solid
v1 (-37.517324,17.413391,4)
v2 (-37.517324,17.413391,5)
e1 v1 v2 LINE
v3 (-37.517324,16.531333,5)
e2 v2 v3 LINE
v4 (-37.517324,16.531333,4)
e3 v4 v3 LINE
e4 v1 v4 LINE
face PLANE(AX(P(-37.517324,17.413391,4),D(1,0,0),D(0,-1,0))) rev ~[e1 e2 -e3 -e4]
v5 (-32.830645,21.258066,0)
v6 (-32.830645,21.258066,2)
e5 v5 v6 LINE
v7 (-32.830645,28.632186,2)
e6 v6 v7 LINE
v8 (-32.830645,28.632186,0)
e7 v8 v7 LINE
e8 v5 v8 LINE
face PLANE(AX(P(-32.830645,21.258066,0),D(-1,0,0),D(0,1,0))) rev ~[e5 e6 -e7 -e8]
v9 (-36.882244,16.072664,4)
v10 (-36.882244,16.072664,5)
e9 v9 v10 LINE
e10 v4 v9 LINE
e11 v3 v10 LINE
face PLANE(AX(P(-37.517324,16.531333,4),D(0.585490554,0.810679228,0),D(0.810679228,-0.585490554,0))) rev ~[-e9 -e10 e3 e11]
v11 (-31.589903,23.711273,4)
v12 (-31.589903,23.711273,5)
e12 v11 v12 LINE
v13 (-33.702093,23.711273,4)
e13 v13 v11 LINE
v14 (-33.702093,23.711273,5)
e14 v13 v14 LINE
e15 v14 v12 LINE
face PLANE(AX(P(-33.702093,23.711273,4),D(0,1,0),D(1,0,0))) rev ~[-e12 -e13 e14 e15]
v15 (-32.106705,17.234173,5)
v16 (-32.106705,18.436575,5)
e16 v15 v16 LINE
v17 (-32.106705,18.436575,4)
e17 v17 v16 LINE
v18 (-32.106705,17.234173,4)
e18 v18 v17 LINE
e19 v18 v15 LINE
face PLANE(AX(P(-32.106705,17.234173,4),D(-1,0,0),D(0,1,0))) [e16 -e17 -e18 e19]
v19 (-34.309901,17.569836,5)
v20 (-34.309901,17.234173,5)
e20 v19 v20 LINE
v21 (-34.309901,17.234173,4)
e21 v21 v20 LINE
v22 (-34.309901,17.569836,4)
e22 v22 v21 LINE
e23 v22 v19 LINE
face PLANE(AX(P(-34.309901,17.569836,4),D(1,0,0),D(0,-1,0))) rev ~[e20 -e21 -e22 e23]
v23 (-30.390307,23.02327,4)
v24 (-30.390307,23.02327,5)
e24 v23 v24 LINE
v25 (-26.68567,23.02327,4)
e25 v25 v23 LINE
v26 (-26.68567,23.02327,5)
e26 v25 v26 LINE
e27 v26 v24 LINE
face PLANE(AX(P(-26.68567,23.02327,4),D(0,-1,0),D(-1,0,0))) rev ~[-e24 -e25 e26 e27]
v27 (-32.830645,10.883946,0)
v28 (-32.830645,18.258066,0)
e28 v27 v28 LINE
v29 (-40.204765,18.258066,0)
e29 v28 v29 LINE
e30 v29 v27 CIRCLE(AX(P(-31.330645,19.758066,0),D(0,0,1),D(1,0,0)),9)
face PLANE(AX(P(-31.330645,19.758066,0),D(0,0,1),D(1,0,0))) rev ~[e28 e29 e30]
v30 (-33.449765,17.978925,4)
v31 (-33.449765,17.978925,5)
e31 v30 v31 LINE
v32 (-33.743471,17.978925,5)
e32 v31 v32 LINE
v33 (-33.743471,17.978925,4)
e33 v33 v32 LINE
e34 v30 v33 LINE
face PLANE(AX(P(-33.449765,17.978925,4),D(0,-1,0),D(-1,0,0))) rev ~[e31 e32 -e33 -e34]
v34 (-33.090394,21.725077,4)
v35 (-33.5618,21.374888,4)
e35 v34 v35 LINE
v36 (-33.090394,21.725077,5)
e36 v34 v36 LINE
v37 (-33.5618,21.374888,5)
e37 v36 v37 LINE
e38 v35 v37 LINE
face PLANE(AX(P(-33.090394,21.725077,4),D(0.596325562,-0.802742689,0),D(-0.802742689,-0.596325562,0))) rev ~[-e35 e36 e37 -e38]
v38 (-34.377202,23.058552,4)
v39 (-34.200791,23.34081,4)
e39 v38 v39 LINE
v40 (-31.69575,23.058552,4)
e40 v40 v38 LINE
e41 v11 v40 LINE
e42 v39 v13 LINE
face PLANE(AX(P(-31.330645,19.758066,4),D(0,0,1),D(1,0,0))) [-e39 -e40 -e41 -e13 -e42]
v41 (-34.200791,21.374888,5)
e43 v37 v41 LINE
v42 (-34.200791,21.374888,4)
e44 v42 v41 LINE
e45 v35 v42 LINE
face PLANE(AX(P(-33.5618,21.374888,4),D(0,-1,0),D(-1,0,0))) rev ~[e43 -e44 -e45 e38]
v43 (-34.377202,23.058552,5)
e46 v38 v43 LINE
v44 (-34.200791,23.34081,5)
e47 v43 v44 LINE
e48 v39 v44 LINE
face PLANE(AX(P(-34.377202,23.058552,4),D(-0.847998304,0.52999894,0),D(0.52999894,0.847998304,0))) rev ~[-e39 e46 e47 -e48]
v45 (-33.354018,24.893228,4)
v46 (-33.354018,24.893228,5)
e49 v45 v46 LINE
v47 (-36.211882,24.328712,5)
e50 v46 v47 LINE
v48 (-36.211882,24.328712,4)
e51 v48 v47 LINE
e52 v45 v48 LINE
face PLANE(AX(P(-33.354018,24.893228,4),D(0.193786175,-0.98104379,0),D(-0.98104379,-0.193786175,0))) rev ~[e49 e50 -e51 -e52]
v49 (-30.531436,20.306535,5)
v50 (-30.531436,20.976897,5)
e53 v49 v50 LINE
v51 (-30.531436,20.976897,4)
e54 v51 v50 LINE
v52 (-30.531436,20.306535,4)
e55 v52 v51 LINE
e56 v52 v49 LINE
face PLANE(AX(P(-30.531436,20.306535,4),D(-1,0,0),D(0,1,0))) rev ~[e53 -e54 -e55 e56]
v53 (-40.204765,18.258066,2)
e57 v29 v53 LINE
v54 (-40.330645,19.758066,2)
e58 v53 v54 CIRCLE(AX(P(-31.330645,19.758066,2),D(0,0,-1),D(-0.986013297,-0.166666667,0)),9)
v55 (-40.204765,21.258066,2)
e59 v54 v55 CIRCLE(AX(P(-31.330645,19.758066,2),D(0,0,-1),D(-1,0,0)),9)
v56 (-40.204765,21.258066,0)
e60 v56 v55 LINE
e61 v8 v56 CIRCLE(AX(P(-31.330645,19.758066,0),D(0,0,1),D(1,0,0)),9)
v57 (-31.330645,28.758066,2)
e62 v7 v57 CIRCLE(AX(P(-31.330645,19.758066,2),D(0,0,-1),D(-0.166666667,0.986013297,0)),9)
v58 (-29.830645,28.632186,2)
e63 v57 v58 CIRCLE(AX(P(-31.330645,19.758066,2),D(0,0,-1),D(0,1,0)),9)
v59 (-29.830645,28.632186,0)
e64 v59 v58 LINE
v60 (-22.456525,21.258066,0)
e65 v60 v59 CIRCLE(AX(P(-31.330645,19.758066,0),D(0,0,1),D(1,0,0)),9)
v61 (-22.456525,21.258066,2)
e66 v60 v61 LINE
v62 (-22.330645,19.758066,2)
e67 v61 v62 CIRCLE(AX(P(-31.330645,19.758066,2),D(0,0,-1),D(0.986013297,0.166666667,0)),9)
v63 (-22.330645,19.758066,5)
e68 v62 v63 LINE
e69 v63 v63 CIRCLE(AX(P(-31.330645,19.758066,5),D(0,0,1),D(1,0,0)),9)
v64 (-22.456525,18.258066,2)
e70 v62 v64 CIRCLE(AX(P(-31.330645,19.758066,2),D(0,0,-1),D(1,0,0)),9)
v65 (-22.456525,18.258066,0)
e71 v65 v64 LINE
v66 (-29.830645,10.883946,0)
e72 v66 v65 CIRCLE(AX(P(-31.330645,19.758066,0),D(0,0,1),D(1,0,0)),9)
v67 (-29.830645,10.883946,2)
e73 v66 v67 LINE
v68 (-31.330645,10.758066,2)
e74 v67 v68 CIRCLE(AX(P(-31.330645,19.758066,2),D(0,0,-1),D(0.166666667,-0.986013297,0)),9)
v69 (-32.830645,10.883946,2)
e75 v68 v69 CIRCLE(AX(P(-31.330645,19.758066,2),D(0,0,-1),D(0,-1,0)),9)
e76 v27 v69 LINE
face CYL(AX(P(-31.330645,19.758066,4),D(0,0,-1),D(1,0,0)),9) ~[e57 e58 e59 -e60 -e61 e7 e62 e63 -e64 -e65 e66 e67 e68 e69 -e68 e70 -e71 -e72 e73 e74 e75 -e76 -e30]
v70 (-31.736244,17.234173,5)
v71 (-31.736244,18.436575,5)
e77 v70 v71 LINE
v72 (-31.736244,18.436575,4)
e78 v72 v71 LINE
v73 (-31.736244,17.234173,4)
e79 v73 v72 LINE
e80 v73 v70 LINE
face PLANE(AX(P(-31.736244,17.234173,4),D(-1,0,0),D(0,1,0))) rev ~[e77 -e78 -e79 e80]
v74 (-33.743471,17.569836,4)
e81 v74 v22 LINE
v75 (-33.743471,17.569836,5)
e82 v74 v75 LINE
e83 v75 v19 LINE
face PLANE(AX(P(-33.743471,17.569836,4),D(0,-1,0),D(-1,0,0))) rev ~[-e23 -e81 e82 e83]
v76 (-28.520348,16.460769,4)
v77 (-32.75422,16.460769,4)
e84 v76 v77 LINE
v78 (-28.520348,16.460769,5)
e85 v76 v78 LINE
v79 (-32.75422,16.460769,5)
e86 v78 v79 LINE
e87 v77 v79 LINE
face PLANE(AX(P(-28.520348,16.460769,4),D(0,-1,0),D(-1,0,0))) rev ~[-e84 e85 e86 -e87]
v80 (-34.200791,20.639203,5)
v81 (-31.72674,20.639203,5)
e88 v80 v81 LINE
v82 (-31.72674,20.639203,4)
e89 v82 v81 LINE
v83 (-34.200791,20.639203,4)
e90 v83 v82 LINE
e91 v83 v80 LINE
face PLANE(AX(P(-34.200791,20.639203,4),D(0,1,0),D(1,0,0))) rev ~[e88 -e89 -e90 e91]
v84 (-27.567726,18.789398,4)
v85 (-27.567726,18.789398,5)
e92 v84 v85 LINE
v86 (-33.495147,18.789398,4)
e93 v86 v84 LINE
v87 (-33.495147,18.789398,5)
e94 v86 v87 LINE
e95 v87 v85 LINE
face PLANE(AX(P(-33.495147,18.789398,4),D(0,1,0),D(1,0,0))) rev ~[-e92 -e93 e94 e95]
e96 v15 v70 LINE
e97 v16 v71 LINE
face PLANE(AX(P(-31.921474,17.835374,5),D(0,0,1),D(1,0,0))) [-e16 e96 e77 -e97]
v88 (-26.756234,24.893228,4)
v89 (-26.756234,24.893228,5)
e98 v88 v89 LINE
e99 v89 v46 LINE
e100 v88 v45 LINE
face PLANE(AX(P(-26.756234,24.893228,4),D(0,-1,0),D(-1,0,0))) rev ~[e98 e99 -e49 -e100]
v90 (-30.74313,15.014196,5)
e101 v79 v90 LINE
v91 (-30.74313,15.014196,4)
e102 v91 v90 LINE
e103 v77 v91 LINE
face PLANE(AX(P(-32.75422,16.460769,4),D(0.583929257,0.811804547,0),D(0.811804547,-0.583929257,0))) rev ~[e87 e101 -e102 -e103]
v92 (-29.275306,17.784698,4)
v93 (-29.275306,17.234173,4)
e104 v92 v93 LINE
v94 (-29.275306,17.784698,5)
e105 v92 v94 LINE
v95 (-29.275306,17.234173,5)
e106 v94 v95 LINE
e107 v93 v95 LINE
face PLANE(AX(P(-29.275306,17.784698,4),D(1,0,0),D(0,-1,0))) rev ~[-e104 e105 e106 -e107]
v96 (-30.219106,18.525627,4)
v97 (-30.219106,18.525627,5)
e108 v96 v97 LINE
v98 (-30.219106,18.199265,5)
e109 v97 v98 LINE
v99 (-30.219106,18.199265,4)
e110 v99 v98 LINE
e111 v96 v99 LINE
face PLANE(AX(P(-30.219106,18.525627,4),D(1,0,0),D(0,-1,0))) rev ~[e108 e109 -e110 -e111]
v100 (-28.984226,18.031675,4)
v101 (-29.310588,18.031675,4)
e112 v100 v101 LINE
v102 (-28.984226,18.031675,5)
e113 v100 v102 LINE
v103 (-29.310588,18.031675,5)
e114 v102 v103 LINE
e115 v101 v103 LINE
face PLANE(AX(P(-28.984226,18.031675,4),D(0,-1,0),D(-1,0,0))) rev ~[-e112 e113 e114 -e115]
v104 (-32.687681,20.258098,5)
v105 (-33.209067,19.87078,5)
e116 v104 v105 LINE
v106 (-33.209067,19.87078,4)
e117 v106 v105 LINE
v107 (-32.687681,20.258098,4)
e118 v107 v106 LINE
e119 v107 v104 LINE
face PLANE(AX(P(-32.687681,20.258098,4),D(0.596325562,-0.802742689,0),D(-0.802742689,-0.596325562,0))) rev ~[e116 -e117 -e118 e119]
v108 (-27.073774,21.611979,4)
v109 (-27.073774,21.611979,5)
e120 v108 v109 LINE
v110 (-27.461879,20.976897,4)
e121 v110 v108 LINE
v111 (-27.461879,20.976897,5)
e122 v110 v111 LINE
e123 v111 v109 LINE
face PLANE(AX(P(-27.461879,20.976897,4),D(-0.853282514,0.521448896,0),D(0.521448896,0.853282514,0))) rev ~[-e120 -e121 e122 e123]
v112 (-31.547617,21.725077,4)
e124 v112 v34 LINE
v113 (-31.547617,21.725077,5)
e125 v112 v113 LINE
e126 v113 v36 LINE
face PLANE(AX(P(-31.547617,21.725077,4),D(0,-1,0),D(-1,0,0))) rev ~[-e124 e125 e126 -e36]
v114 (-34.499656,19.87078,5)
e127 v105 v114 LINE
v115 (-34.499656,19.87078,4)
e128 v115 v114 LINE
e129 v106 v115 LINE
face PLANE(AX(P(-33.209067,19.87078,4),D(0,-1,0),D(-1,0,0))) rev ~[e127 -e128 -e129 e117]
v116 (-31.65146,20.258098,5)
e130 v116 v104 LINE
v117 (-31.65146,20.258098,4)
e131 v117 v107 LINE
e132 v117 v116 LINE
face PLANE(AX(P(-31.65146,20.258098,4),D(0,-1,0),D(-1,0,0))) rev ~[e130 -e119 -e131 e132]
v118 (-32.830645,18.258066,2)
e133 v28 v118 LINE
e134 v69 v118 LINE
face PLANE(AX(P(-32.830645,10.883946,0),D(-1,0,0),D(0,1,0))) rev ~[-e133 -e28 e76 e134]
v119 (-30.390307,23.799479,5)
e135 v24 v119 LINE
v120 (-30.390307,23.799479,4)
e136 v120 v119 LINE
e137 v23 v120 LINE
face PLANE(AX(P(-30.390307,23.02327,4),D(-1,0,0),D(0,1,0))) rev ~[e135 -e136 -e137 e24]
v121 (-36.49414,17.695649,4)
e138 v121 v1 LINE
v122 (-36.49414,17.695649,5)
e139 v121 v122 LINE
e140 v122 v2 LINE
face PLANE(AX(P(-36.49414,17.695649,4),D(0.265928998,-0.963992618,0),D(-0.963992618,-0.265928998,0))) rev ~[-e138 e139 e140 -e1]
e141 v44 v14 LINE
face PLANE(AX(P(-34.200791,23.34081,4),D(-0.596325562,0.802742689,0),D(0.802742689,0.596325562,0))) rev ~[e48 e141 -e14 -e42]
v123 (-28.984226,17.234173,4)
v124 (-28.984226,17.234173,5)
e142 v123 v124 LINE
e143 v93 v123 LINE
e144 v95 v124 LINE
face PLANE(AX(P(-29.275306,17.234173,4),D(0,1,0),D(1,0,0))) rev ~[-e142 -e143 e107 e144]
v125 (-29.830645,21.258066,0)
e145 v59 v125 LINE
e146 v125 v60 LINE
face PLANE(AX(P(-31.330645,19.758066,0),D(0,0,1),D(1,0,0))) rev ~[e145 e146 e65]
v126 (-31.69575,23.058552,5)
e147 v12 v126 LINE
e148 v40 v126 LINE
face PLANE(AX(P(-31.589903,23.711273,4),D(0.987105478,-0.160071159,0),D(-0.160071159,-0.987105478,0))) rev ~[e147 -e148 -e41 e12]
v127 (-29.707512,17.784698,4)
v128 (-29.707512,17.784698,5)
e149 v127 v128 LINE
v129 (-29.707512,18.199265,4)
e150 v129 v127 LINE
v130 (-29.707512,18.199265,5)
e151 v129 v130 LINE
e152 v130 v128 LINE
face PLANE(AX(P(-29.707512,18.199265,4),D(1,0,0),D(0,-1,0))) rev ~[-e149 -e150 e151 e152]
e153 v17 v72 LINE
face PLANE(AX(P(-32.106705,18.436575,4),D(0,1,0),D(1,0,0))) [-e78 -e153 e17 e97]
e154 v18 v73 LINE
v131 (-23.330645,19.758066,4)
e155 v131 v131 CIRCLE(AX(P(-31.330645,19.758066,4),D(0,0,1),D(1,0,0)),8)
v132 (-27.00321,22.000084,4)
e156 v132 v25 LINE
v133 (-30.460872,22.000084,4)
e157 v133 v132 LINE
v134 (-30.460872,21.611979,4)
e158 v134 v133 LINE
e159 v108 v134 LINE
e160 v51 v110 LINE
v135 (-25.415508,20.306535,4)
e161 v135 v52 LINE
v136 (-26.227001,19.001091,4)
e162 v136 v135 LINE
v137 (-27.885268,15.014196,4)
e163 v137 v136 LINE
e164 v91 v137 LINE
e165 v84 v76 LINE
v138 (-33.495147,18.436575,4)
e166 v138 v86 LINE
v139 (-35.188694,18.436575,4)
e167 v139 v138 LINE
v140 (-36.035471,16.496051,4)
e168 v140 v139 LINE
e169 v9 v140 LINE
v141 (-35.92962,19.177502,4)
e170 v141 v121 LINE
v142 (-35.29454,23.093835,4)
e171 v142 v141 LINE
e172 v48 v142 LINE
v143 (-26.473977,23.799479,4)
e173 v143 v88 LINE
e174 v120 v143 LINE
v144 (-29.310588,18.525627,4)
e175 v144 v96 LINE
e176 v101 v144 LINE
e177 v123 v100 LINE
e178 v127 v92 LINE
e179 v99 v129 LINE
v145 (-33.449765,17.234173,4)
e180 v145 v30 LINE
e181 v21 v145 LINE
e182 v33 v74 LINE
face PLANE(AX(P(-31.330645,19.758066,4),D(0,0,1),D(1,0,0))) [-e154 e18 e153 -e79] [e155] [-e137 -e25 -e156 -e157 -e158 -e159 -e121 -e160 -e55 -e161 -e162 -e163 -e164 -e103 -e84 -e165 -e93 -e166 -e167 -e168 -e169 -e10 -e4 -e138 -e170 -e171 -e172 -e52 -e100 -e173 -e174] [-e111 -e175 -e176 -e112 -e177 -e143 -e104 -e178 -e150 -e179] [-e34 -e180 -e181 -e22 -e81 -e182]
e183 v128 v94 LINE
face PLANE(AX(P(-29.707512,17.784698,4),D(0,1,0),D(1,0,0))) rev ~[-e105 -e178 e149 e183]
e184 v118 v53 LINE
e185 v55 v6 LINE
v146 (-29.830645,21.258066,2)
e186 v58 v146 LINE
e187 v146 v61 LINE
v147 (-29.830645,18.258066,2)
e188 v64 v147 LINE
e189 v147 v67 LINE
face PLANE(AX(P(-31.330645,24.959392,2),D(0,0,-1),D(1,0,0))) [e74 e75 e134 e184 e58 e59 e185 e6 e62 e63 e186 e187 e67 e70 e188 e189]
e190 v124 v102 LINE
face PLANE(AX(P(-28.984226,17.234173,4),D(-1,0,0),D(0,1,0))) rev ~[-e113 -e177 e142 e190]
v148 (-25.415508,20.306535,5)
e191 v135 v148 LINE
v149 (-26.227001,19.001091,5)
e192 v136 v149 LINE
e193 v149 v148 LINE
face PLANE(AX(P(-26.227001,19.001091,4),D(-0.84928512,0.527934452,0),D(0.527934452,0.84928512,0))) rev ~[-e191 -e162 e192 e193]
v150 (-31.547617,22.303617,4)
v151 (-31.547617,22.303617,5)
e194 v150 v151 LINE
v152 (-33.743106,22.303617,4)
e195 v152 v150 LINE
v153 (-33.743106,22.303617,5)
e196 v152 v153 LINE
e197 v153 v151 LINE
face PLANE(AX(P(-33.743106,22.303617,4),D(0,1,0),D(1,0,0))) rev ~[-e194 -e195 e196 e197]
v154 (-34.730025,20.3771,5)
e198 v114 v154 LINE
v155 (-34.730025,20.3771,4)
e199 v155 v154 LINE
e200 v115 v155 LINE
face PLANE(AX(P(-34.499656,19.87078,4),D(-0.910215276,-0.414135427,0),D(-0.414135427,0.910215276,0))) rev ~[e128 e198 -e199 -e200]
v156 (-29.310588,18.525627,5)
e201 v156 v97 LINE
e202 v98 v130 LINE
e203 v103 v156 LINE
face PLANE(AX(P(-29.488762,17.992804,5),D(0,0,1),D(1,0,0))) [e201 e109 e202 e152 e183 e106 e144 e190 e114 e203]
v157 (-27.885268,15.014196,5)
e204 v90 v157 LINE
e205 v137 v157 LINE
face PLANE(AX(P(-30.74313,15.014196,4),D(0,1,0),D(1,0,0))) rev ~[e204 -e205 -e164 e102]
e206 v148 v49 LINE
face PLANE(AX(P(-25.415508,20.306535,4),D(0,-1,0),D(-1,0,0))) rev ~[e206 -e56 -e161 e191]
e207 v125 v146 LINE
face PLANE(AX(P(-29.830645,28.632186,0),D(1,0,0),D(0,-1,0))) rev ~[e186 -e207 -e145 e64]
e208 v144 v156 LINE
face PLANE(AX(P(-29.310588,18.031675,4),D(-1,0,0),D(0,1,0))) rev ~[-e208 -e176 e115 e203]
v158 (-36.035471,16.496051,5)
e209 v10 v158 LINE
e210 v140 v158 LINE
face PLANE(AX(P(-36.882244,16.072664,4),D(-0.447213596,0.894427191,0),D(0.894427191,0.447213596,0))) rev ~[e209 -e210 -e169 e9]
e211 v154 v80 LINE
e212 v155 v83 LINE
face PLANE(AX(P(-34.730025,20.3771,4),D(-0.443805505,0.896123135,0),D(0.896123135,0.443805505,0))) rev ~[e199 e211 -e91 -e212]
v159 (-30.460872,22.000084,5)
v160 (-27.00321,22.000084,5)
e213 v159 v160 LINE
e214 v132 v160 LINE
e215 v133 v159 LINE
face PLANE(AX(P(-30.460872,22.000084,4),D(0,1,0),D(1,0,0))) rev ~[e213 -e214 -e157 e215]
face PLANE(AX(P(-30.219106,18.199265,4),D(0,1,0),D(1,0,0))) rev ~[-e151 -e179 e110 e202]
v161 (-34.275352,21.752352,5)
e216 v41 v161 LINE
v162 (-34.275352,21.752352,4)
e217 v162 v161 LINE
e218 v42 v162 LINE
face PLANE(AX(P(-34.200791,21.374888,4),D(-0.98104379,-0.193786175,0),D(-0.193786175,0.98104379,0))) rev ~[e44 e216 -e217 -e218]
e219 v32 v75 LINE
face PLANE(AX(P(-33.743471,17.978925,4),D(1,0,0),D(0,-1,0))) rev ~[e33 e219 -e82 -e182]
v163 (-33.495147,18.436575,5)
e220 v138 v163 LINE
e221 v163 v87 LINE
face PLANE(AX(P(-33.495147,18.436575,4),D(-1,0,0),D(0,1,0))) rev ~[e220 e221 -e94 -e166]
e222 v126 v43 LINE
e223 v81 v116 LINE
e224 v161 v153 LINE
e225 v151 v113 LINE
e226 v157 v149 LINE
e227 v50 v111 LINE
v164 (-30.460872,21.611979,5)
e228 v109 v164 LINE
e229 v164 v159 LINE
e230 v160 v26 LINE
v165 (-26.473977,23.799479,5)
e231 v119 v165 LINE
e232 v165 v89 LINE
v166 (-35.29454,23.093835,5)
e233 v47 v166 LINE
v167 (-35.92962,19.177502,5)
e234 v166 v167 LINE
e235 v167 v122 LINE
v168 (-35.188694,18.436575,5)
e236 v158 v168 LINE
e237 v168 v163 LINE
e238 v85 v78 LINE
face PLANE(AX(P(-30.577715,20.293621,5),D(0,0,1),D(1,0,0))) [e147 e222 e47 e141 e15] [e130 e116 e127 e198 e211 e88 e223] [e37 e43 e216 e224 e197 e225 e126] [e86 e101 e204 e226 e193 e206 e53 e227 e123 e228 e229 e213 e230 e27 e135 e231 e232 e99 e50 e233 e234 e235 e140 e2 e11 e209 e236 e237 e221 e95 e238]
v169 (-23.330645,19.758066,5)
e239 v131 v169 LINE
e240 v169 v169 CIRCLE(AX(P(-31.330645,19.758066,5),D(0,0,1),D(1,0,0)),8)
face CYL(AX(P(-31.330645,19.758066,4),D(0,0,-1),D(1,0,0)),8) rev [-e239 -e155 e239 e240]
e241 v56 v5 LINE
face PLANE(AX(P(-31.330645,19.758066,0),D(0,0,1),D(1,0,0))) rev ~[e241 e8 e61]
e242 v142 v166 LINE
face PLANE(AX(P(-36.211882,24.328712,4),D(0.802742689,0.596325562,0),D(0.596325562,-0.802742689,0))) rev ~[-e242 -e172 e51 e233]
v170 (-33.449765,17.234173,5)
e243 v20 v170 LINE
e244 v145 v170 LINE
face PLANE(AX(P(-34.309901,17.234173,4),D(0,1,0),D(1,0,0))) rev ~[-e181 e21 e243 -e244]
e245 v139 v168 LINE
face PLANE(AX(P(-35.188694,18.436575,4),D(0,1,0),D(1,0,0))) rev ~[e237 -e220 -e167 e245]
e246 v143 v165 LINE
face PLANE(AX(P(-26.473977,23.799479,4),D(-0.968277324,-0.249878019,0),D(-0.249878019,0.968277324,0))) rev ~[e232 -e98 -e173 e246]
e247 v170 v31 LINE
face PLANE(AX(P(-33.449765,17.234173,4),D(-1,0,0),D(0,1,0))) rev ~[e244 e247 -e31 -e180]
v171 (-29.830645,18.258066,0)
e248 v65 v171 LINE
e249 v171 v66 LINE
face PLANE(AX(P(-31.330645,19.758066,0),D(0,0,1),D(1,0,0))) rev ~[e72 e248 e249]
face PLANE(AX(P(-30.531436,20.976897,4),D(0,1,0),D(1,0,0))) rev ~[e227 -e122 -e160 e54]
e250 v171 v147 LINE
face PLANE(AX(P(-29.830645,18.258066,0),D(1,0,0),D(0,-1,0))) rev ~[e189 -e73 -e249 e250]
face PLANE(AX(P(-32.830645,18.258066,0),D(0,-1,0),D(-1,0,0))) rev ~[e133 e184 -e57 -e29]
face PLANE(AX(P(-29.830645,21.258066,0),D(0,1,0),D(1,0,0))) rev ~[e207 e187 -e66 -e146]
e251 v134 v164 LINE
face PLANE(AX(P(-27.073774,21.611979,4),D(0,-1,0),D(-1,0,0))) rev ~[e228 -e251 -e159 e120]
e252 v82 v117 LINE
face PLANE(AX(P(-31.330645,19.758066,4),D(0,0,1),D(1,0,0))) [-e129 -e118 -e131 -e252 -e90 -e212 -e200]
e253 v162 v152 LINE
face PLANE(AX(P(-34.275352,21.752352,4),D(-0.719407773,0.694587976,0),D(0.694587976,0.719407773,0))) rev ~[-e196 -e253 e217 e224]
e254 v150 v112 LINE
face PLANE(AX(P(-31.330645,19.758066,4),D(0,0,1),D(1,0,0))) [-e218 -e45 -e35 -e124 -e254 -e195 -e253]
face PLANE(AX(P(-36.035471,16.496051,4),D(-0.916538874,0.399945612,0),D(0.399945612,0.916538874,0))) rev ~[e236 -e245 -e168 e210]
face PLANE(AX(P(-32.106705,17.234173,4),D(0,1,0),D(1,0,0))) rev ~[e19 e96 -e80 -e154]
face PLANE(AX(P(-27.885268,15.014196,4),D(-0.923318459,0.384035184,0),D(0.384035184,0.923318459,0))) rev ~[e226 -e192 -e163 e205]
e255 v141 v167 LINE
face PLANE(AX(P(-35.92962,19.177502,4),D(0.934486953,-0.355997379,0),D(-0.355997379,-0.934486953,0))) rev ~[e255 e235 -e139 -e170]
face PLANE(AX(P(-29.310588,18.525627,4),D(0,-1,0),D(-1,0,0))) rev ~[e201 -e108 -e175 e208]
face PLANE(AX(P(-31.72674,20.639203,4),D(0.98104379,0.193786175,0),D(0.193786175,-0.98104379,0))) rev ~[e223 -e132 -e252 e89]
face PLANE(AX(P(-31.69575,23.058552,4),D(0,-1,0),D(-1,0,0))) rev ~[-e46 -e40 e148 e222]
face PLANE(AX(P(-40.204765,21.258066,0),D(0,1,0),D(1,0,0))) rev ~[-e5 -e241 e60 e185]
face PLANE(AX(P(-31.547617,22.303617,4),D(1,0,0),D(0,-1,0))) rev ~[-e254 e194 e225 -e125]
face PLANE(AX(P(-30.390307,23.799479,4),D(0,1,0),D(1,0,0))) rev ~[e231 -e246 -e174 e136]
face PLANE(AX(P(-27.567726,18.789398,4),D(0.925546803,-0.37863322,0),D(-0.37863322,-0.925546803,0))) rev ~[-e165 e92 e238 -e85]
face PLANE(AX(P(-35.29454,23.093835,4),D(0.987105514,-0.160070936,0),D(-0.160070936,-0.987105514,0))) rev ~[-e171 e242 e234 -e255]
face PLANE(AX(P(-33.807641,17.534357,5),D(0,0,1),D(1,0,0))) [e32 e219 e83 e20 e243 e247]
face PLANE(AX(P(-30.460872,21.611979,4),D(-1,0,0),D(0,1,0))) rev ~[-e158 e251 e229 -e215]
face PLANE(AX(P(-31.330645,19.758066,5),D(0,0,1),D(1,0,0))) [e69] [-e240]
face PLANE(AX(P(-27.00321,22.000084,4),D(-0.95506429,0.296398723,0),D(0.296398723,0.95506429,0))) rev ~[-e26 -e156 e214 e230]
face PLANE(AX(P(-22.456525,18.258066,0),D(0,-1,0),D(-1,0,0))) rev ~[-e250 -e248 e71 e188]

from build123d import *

# Parameters (mm, degrees)
F0_R     = 9
F1_DEPTH = 4
F2_W     = 3
F2_H     = 3
F3_DEPTH = 2
F5_R     = 9
F5_R_2   = 8
F5_W     = 0.3704614937
F5_H     = 1.2024026364
F4_DEPTH = 1


with BuildPart() as f1:
    # F0 (on Top) → F1 (new body)
    with BuildSketch(Plane.XY):
        with Locations((-31.3306450844, 19.7580661625)):
            Circle(F0_R)
    extrude(amount=F1_DEPTH)

    # F2 (on face) → F3 (cut)
    with BuildSketch(Plane(origin=(0, 0, 0), x_dir=(1, 0, 0), z_dir=(0, 0, -1))):
        with BuildLine():
            ThreePointArc((-32.8306450844, -28.6321858371), (-32.0832814269, -28.7265408676), (-31.3306450844, -28.7580661625))
            ThreePointArc((-31.3306450844, -28.7580661625), (-30.5780087419, -28.7265408676), (-29.8306450844, -28.6321858371))
            Line((-29.8306450844, -28.6321858371), (-29.8306450844, -21.2580661625))
            Line((-29.8306450844, -21.2580661625), (-32.8306450844, -21.2580661625))
            Line((-32.8306450844, -21.2580661625), (-32.8306450844, -28.6321858371))
        make_face()
        with BuildLine():
            ThreePointArc((-40.204764759, -18.2580661625), (-40.2991197895, -19.0054298199), (-40.3306450844, -19.7580661625))
            ThreePointArc((-40.3306450844, -19.7580661625), (-40.2991197895, -20.510702505), (-40.204764759, -21.2580661625))
            Line((-40.204764759, -21.2580661625), (-32.8306450844, -21.2580661625))
            Line((-32.8306450844, -21.2580661625), (-32.8306450844, -18.2580661625))
            Line((-32.8306450844, -18.2580661625), (-40.204764759, -18.2580661625))
        make_face()
        with Locations((-31.3306450844, -19.7580661625)):
            Rectangle(F2_W, F2_H)
        with BuildLine():
            Line((-29.8306450844, -18.2580661625), (-29.8306450844, -21.2580661625))
            Line((-29.8306450844, -21.2580661625), (-22.4565254097, -21.2580661625))
            ThreePointArc((-22.4565254097, -21.2580661625), (-22.3621703793, -20.510702505), (-22.3306450844, -19.7580661625))
            ThreePointArc((-22.3306450844, -19.7580661625), (-22.3621703793, -19.0054298199), (-22.4565254097, -18.2580661625))
            Line((-22.4565254097, -18.2580661625), (-29.8306450844, -18.2580661625))
        make_face()
        with BuildLine():
            Line((-32.8306450844, -10.8839464878), (-32.8306450844, -18.2580661625))
            Line((-32.8306450844, -18.2580661625), (-29.8306450844, -18.2580661625))
            Line((-29.8306450844, -18.2580661625), (-29.8306450844, -10.8839464878))
            ThreePointArc((-29.8306450844, -10.8839464878), (-30.5780087419, -10.7895914574), (-31.3306450844, -10.7580661625))
            ThreePointArc((-31.3306450844, -10.7580661625), (-32.0832814269, -10.7895914574), (-32.8306450844, -10.8839464878))
        make_face()
    extrude(amount=-F3_DEPTH, mode=Mode.SUBTRACT)

    # F5 (on face) → F4 (join)
    with BuildSketch(Plane.XY.offset(4)):
        with Locations((-31.3306450844, 19.7580661625)):
            Circle(F5_R)
        with Locations((-31.3306450844, 19.7580661625)):
            Circle(F5_R_2, mode=Mode.SUBTRACT)
        Polygon((-33.3540178835, 24.8932279646), (-36.2118817866, 24.328712374), (-35.2945402265, 23.0938345194), (-35.929620266, 19.1775020212), (-36.4941395819, 17.6956485957), (-37.51732409, 17.4133908004), (-37.51732409, 16.5313333273), (-36.8822440505, 16.0726644099), (-36.0354706645, 16.4960511029), (-35.1886935532, 18.4365753084), (-33.4951467812, 18.4365753084), (-33.4951467812, 18.7893975526), (-27.5677256286, 18.7893975526), (-28.5203475505, 16.4607688785), (-32.7542200685, 16.4607688785), (-30.7431295514, 15.0141958147), (-27.885267511, 15.0141958147), (-26.2270011008, 19.0010908991), (-25.4155080765, 20.3065350652), (-30.5314362049, 20.3065350652), (-30.5314362049, 20.9768973291), (-27.4618789554, 20.9768973291), (-27.0737744868, 21.6119792312), (-30.4608717561, 21.6119792312), (-30.4608717561, 22.0000836998), (-27.0032100379, 22.0000836998), (-26.6856700182, 23.0232700706), (-30.3903073072, 23.0232700706), (-30.3903073072, 23.7994790077), (-26.4739766717, 23.7994790077), (-26.756234467, 24.8932279646), align=None)
        Polygon((-34.499656409, 19.8707804084), (-34.7300246358, 20.377099514), (-34.2007912695, 20.6392026472), (-31.7267395564, 20.6392026472), (-31.6514596343, 20.258097545), (-32.6876805022, 20.258097545), (-33.209066838, 19.8707804084), align=None, mode=Mode.SUBTRACT)
        Polygon((-34.2753518545, 21.7523517899), (-33.7431058288, 22.3036166281), (-31.5476171672, 22.3036166281), (-31.5476171672, 21.7250771821), (-33.0903939903, 21.7250771821), (-33.5618001374, 21.3748883364), (-34.2007912695, 21.3748883364), align=None, mode=Mode.SUBTRACT)
        Polygon((-34.3772023916, 23.058552295), (-34.2007912695, 23.3408100903), (-33.7020926227, 23.7112734467), (-31.5899029374, 23.7112734467), (-31.6957496107, 23.058552295), align=None, mode=Mode.SUBTRACT)
        Polygon((-33.7434709072, 17.5698362291), (-34.3099012971, 17.5698362291), (-34.3099012971, 17.234172672), (-33.4497652948, 17.234172672), (-33.4497652948, 17.9789252579), (-33.7434709072, 17.9789252579), align=None)
        with Locations((-31.9214742631, 17.8353739902)):
            Rectangle(F5_W, F5_H)
        Polygon((-29.3105877936, 18.5256265104), (-30.2191060036, 18.5256265104), (-30.2191060036, 18.1992650032), (-29.707511887, 18.1992650032), (-29.707511887, 17.784697935), (-29.2753055692, 17.784697935), (-29.2753055692, 17.234172672), (-28.9842262864, 17.234172672), (-28.9842262864, 18.0316753685), (-29.3105877936, 18.0316753685), align=None)
    extrude(amount=F4_DEPTH)


solid = f1.part
